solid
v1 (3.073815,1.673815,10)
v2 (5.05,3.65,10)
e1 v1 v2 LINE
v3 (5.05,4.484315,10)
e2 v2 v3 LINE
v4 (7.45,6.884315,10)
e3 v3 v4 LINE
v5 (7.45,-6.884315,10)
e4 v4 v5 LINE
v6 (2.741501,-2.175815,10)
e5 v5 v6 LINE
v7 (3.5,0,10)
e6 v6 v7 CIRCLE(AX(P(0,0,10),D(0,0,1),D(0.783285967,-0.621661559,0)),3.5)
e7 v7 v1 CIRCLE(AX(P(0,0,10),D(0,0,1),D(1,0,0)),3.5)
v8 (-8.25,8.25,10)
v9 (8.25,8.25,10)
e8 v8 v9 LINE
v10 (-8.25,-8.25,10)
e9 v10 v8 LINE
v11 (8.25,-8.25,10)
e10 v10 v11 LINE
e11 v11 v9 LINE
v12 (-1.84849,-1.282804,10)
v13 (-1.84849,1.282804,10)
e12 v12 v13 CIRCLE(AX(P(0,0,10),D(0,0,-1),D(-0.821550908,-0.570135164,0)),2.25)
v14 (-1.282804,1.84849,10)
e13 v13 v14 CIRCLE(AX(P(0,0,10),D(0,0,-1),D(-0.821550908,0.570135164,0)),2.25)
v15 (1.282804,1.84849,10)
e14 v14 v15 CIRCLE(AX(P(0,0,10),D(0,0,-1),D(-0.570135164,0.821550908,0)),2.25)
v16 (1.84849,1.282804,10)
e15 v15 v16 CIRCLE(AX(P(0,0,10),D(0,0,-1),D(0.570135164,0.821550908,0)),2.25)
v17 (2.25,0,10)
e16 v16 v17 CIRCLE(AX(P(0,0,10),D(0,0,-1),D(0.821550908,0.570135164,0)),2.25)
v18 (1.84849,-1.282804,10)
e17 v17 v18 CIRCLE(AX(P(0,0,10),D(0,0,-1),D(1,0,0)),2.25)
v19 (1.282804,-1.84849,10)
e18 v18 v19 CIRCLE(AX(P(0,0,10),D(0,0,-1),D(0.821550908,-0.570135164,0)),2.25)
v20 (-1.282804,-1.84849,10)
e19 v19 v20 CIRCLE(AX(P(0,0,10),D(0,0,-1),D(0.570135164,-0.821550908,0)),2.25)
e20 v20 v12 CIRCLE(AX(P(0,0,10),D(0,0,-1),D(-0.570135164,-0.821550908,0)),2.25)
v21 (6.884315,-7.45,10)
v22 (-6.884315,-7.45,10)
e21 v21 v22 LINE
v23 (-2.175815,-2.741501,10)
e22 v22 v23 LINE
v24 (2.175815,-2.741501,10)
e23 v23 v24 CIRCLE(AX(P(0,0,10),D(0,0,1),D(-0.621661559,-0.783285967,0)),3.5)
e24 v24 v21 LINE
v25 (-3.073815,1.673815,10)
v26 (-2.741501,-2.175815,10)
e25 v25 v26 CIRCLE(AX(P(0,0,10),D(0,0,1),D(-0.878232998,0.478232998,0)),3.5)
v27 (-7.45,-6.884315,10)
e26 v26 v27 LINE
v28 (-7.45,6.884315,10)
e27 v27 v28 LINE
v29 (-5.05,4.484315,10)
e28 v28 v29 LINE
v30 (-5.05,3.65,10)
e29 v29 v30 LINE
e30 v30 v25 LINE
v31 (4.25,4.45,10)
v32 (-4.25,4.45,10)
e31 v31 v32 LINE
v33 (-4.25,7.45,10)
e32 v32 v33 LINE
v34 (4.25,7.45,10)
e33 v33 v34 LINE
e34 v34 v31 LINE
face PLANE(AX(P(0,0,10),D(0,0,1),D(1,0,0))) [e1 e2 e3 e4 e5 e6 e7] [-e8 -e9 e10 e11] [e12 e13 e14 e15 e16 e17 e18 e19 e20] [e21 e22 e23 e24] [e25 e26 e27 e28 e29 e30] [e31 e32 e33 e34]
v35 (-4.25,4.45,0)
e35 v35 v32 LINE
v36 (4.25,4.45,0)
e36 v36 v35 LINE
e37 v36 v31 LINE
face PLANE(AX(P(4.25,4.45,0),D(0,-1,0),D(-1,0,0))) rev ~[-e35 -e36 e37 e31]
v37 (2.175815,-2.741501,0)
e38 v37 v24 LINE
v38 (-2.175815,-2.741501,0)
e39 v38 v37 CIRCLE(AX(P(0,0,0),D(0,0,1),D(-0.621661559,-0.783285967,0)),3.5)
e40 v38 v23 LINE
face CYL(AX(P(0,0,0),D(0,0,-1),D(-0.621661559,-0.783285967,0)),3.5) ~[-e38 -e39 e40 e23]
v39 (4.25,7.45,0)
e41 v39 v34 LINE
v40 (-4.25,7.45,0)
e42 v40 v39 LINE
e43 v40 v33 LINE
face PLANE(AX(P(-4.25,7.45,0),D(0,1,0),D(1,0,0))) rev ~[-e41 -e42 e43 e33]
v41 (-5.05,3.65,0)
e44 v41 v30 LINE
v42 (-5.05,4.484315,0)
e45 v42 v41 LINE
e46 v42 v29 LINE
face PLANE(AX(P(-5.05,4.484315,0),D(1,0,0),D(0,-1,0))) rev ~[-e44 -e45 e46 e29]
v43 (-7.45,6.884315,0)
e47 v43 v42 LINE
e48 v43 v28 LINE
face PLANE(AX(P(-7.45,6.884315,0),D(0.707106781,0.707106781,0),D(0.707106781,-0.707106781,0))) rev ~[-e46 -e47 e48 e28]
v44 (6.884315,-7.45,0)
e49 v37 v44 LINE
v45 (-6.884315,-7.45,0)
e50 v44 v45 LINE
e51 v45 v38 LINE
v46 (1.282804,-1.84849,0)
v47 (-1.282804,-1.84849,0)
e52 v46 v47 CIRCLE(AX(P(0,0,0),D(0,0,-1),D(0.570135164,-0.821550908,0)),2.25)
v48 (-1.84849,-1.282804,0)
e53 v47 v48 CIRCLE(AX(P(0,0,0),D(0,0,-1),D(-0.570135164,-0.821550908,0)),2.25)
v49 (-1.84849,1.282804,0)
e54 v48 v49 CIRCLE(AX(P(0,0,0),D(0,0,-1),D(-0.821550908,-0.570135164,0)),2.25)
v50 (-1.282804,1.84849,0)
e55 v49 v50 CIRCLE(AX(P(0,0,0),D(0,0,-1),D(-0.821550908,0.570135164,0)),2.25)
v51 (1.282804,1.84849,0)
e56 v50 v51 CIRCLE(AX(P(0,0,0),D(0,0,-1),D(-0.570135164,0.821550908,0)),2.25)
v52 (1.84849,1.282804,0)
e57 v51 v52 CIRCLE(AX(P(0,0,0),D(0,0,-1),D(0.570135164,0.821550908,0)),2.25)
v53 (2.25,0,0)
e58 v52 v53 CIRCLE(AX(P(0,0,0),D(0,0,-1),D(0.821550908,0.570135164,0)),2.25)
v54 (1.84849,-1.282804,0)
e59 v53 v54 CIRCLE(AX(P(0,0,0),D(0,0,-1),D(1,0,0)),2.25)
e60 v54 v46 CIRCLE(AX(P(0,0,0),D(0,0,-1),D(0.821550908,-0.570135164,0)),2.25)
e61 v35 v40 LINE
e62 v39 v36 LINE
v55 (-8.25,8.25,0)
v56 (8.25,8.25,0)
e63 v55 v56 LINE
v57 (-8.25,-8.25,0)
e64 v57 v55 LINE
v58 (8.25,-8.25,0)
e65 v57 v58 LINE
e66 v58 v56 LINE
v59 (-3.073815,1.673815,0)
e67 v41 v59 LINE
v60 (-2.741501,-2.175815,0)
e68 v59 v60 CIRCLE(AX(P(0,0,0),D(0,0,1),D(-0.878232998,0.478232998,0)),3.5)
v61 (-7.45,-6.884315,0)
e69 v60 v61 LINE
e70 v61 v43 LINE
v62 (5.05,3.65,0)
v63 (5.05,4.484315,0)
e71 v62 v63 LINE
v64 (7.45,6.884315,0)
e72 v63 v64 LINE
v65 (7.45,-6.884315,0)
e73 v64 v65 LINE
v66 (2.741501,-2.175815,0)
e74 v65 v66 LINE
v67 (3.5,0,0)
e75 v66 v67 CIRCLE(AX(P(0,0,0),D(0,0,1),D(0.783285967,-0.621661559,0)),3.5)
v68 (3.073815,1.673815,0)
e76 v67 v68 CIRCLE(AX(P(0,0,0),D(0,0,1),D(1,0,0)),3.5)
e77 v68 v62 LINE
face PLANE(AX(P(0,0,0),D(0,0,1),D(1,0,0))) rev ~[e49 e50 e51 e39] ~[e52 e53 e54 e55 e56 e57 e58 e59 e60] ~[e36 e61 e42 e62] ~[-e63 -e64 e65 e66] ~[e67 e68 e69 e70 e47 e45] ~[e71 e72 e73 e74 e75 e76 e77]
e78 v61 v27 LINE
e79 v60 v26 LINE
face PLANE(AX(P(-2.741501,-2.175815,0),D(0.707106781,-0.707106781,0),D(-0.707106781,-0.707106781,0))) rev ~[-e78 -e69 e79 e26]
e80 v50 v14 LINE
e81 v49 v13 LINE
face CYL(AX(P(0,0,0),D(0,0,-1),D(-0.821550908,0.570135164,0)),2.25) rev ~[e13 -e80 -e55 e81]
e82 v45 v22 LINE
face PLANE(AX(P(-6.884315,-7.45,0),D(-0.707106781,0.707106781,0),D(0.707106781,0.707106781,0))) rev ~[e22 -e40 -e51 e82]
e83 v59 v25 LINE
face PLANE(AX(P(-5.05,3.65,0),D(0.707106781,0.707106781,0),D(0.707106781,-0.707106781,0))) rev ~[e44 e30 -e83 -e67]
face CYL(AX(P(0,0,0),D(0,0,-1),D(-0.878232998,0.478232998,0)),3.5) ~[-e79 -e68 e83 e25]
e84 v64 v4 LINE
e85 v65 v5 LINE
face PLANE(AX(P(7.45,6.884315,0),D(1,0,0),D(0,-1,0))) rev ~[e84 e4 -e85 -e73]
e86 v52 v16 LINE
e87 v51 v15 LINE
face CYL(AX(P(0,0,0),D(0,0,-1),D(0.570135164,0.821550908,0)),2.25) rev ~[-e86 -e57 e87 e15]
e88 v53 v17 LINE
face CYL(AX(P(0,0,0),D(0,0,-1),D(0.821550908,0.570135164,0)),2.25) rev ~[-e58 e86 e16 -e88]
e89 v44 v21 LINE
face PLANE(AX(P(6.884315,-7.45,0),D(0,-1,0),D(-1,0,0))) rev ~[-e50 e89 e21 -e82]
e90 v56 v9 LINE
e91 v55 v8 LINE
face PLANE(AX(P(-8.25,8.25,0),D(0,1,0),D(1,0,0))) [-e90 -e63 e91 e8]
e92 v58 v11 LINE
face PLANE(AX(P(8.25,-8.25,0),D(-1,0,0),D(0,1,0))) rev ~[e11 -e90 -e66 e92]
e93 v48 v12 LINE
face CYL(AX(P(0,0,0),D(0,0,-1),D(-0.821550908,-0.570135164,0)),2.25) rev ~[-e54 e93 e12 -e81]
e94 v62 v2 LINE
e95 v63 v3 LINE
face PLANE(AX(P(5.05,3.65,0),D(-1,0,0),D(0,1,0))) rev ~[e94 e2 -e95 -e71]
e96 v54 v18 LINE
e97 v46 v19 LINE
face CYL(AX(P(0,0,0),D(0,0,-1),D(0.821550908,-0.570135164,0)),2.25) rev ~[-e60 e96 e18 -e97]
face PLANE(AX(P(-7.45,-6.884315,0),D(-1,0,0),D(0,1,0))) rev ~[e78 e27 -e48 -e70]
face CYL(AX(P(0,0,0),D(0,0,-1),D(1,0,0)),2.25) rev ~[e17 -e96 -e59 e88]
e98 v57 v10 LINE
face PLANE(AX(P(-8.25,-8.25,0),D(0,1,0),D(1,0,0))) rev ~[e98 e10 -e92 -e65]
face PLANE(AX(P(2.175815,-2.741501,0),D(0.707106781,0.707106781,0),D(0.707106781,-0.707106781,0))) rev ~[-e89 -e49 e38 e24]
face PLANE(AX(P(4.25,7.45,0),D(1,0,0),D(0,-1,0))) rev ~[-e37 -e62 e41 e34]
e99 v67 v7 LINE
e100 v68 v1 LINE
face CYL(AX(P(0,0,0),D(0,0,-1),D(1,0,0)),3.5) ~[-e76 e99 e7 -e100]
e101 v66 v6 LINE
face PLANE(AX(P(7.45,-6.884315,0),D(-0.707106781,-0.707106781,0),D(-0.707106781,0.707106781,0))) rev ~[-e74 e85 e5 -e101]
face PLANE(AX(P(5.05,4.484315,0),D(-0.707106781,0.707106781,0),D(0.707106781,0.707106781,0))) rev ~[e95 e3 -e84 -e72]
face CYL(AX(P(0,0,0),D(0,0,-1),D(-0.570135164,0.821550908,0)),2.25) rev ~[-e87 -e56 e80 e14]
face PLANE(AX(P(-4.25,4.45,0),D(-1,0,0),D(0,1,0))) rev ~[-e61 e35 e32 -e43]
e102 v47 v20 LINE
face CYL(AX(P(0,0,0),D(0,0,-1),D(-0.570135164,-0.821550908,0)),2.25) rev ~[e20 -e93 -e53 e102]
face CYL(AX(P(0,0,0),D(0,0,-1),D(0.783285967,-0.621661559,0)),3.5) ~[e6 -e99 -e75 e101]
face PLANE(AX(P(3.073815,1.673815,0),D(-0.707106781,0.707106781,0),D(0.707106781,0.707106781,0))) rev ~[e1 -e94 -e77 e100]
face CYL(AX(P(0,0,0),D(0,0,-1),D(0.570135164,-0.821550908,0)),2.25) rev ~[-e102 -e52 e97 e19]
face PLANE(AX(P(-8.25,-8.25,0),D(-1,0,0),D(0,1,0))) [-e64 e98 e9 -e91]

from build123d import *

# Parameters (mm, degrees)
F0_W     = 16.5
F0_H     = 16.5
F1_DEPTH = 10


# Not quite as in the source:
# - a feature names something its author has since deleted; it is built from what else it names


with BuildPart() as f1:
    # F0 (on Top) → F1 (new body)
    with BuildSketch(Plane.XY):
        Rectangle(F0_W, F0_H)
        Polygon((6.8843145751, 7.45), (7.45, 7.45), (7.45, 6.8843145751), (7.45, -6.8843145751), (7.45, -7.45), (6.8843145751, -7.45), (-6.8843145751, -7.45), (-7.45, -7.45), (-7.45, -6.8843145751), (-7.45, 6.8843145751), (-7.45, 7.45), (-6.8843145751, 7.45), (-5.05, 7.45), (-4.25, 7.45), (4.25, 7.45), (5.05, 7.45), align=None, mode=Mode.SUBTRACT)
        Polygon((-4.25, 4.8156854249), (-4.25, 7.45), (-5.05, 7.45), (-5.05, 5.6156854249), align=None)
        Polygon((-4.25, 4.45), (-4.25, 4.8156854249), (-5.05, 5.6156854249), (-5.05, 4.4843145751), (-4.2156854249, 3.65), (-3.0843145751, 3.65), (-3.8843145751, 4.45), align=None)
        Polygon((7.45, 6.8843145751), (7.45, 7.45), (6.8843145751, 7.45), (5.05, 5.6156854249), (5.05, 4.4843145751), align=None)
        Polygon((-5.05, 5.6156854249), (-6.8843145751, 7.45), (-7.45, 7.45), (-7.45, 6.8843145751), (-5.05, 4.4843145751), align=None)
        with BuildLine():
            Line((-1.2828041187, 1.8484895437), (-2.1758154582, 2.7415008831))
            ThreePointArc((-2.1758154582, 2.7415008831), (-2.4748737342, 2.4748737342), (-2.7415008831, 2.1758154582))
            Line((-2.7415008831, 2.1758154582), (-1.8484895437, 1.2828041187))
            ThreePointArc((-1.8484895437, 1.2828041187), (-1.5909902577, 1.5909902577), (-1.2828041187, 1.8484895437))
        make_face()
        with BuildLine():
            ThreePointArc((-3.0738154941, 1.6738154941), (-3.4870317978, -0.3010136893), (-2.7415008831, -2.1758154582))
            Line((-2.7415008831, -2.1758154582), (-1.8484895437, -1.2828041187))
            ThreePointArc((-1.8484895437, -1.2828041187), (-2.25, 0), (-1.8484895437, 1.2828041187))
            Line((-1.8484895437, 1.2828041187), (-2.7415008831, 2.1758154582))
            ThreePointArc((-2.7415008831, 2.1758154582), (-2.9184717118, 1.9319738268), (-3.0738154941, 1.6738154941))
        make_face()
        with BuildLine():
            ThreePointArc((-2.7415008831, -2.1758154582), (-2.4748737342, -2.4748737342), (-2.1758154582, -2.7415008831))
            Line((-2.1758154582, -2.7415008831), (-1.2828041187, -1.8484895437))
            ThreePointArc((-1.2828041187, -1.8484895437), (-1.5909902577, -1.5909902577), (-1.8484895437, -1.2828041187))
            Line((-1.8484895437, -1.2828041187), (-2.7415008831, -2.1758154582))
        make_face()
        with BuildLine():
            Line((-7.45, -7.45), (-6.8843145751, -7.45))
            Line((-6.8843145751, -7.45), (-2.1758154582, -2.7415008831))
            ThreePointArc((-2.1758154582, -2.7415008831), (-2.4748737342, -2.4748737342), (-2.7415008831, -2.1758154582))
            Line((-2.7415008831, -2.1758154582), (-7.45, -6.8843145751))
            Line((-7.45, -6.8843145751), (-7.45, -7.45))
        make_face()
        with BuildLine():
            ThreePointArc((-2.1758154582, -2.7415008831), (0, -3.5), (2.1758154582, -2.7415008831))
            Line((2.1758154582, -2.7415008831), (1.2828041187, -1.8484895437))
            ThreePointArc((1.2828041187, -1.8484895437), (0, -2.25), (-1.2828041187, -1.8484895437))
            Line((-1.2828041187, -1.8484895437), (-2.1758154582, -2.7415008831))
        make_face()
        with BuildLine():
            ThreePointArc((2.1758154582, -2.7415008831), (2.4748737342, -2.4748737342), (2.7415008831, -2.1758154582))
            Line((2.7415008831, -2.1758154582), (1.8484895437, -1.2828041187))
            ThreePointArc((1.8484895437, -1.2828041187), (1.5909902577, -1.5909902577), (1.2828041187, -1.8484895437))
            Line((1.2828041187, -1.8484895437), (2.1758154582, -2.7415008831))
        make_face()
        with BuildLine():
            Line((1.8484895437, -1.2828041187), (2.7415008831, -2.1758154582))
            ThreePointArc((2.7415008831, -2.1758154582), (3.3049397189, -1.1521169448), (3.5, 0))
            ThreePointArc((3.5, 0), (3.3917808176, 0.8636103782), (3.0738154941, 1.6738154941))
            ThreePointArc((3.0738154941, 1.6738154941), (2.9184717118, 1.9319738268), (2.7415008831, 2.1758154582))
            Line((2.7415008831, 2.1758154582), (1.8484895437, 1.2828041187))
            ThreePointArc((1.8484895437, 1.2828041187), (2.1472775174, 0.672085756), (2.25, 0))
            ThreePointArc((2.25, 0), (2.1472775174, -0.672085756), (1.8484895437, -1.2828041187))
        make_face()
        with BuildLine():
            Line((7.45, -7.45), (7.45, -6.8843145751))
            Line((7.45, -6.8843145751), (2.7415008831, -2.1758154582))
            ThreePointArc((2.7415008831, -2.1758154582), (2.4748737342, -2.4748737342), (2.1758154582, -2.7415008831))
            Line((2.1758154582, -2.7415008831), (6.8843145751, -7.45))
            Line((6.8843145751, -7.45), (7.45, -7.45))
        make_face()
        with BuildLine():
            Line((1.8484895437, 1.2828041187), (2.7415008831, 2.1758154582))
            ThreePointArc((2.7415008831, 2.1758154582), (2.4748737342, 2.4748737342), (2.1758154582, 2.7415008831))
            Line((2.1758154582, 2.7415008831), (1.2828041187, 1.8484895437))
            ThreePointArc((1.2828041187, 1.8484895437), (1.5909902577, 1.5909902577), (1.8484895437, 1.2828041187))
        make_face()
        Polygon((5.05, 4.4843145751), (5.05, 5.6156854249), (4.25, 4.8156854249), (4.25, 4.45), (3.8843145751, 4.45), (3.0843145751, 3.65), (4.2156854249, 3.65), align=None)
        Polygon((5.05, 3.65), (5.05, 4.4843145751), (4.2156854249, 3.65), align=None)
        Polygon((5.05, 5.6156854249), (5.05, 7.45), (4.25, 7.45), (4.25, 4.8156854249), align=None)
        Polygon((3.0843145751, 3.65), (3.8843145751, 4.45), (-3.8843145751, 4.45), (-3.0843145751, 3.65), align=None)
        Polygon((5.05, 5.6156854249), (6.8843145751, 7.45), (5.05, 7.45), align=None)
        Polygon((-5.05, 5.6156854249), (-5.05, 7.45), (-6.8843145751, 7.45), align=None)
        Polygon((-5.05, 3.65), (-4.2156854249, 3.65), (-5.05, 4.4843145751), align=None)
        with BuildLine():
            Line((2.1758154582, 2.7415008831), (3.0843145751, 3.65))
            Line((3.0843145751, 3.65), (-3.0843145751, 3.65))
            Line((-3.0843145751, 3.65), (-2.1758154582, 2.7415008831))
            ThreePointArc((-2.1758154582, 2.7415008831), (0, 3.5), (2.1758154582, 2.7415008831))
        make_face()
        with BuildLine():
            Line((-2.1758154582, 2.7415008831), (-3.0843145751, 3.65))
            Line((-3.0843145751, 3.65), (-4.2156854249, 3.65))
            Line((-4.2156854249, 3.65), (-2.7415008831, 2.1758154582))
            ThreePointArc((-2.7415008831, 2.1758154582), (-2.4748737342, 2.4748737342), (-2.1758154582, 2.7415008831))
        make_face()
        with BuildLine():
            Line((2.7415008831, 2.1758154582), (4.2156854249, 3.65))
            Line((4.2156854249, 3.65), (3.0843145751, 3.65))
            Line((3.0843145751, 3.65), (2.1758154582, 2.7415008831))
            ThreePointArc((2.1758154582, 2.7415008831), (2.4748737342, 2.4748737342), (2.7415008831, 2.1758154582))
        make_face()
        with BuildLine():
            Line((-2.7415008831, 2.1758154582), (-4.2156854249, 3.65))
            Line((-4.2156854249, 3.65), (-5.05, 3.65))
            Line((-5.05, 3.65), (-3.0738154941, 1.6738154941))
            ThreePointArc((-3.0738154941, 1.6738154941), (-2.9184717118, 1.9319738268), (-2.7415008831, 2.1758154582))
        make_face()
        with BuildLine():
            Line((3.0738154941, 1.6738154941), (5.05, 3.65))
            Line((5.05, 3.65), (4.2156854249, 3.65))
            Line((4.2156854249, 3.65), (2.7415008831, 2.1758154582))
            ThreePointArc((2.7415008831, 2.1758154582), (2.9184717118, 1.9319738268), (3.0738154941, 1.6738154941))
        make_face()
        with BuildLine():
            Line((1.2828041187, 1.8484895437), (2.1758154582, 2.7415008831))
            ThreePointArc((2.1758154582, 2.7415008831), (0, 3.5), (-2.1758154582, 2.7415008831))
            Line((-2.1758154582, 2.7415008831), (-1.2828041187, 1.8484895437))
            ThreePointArc((-1.2828041187, 1.8484895437), (0, 2.25), (1.2828041187, 1.8484895437))
        make_face()
    extrude(amount=F1_DEPTH)


solid = f1.part
